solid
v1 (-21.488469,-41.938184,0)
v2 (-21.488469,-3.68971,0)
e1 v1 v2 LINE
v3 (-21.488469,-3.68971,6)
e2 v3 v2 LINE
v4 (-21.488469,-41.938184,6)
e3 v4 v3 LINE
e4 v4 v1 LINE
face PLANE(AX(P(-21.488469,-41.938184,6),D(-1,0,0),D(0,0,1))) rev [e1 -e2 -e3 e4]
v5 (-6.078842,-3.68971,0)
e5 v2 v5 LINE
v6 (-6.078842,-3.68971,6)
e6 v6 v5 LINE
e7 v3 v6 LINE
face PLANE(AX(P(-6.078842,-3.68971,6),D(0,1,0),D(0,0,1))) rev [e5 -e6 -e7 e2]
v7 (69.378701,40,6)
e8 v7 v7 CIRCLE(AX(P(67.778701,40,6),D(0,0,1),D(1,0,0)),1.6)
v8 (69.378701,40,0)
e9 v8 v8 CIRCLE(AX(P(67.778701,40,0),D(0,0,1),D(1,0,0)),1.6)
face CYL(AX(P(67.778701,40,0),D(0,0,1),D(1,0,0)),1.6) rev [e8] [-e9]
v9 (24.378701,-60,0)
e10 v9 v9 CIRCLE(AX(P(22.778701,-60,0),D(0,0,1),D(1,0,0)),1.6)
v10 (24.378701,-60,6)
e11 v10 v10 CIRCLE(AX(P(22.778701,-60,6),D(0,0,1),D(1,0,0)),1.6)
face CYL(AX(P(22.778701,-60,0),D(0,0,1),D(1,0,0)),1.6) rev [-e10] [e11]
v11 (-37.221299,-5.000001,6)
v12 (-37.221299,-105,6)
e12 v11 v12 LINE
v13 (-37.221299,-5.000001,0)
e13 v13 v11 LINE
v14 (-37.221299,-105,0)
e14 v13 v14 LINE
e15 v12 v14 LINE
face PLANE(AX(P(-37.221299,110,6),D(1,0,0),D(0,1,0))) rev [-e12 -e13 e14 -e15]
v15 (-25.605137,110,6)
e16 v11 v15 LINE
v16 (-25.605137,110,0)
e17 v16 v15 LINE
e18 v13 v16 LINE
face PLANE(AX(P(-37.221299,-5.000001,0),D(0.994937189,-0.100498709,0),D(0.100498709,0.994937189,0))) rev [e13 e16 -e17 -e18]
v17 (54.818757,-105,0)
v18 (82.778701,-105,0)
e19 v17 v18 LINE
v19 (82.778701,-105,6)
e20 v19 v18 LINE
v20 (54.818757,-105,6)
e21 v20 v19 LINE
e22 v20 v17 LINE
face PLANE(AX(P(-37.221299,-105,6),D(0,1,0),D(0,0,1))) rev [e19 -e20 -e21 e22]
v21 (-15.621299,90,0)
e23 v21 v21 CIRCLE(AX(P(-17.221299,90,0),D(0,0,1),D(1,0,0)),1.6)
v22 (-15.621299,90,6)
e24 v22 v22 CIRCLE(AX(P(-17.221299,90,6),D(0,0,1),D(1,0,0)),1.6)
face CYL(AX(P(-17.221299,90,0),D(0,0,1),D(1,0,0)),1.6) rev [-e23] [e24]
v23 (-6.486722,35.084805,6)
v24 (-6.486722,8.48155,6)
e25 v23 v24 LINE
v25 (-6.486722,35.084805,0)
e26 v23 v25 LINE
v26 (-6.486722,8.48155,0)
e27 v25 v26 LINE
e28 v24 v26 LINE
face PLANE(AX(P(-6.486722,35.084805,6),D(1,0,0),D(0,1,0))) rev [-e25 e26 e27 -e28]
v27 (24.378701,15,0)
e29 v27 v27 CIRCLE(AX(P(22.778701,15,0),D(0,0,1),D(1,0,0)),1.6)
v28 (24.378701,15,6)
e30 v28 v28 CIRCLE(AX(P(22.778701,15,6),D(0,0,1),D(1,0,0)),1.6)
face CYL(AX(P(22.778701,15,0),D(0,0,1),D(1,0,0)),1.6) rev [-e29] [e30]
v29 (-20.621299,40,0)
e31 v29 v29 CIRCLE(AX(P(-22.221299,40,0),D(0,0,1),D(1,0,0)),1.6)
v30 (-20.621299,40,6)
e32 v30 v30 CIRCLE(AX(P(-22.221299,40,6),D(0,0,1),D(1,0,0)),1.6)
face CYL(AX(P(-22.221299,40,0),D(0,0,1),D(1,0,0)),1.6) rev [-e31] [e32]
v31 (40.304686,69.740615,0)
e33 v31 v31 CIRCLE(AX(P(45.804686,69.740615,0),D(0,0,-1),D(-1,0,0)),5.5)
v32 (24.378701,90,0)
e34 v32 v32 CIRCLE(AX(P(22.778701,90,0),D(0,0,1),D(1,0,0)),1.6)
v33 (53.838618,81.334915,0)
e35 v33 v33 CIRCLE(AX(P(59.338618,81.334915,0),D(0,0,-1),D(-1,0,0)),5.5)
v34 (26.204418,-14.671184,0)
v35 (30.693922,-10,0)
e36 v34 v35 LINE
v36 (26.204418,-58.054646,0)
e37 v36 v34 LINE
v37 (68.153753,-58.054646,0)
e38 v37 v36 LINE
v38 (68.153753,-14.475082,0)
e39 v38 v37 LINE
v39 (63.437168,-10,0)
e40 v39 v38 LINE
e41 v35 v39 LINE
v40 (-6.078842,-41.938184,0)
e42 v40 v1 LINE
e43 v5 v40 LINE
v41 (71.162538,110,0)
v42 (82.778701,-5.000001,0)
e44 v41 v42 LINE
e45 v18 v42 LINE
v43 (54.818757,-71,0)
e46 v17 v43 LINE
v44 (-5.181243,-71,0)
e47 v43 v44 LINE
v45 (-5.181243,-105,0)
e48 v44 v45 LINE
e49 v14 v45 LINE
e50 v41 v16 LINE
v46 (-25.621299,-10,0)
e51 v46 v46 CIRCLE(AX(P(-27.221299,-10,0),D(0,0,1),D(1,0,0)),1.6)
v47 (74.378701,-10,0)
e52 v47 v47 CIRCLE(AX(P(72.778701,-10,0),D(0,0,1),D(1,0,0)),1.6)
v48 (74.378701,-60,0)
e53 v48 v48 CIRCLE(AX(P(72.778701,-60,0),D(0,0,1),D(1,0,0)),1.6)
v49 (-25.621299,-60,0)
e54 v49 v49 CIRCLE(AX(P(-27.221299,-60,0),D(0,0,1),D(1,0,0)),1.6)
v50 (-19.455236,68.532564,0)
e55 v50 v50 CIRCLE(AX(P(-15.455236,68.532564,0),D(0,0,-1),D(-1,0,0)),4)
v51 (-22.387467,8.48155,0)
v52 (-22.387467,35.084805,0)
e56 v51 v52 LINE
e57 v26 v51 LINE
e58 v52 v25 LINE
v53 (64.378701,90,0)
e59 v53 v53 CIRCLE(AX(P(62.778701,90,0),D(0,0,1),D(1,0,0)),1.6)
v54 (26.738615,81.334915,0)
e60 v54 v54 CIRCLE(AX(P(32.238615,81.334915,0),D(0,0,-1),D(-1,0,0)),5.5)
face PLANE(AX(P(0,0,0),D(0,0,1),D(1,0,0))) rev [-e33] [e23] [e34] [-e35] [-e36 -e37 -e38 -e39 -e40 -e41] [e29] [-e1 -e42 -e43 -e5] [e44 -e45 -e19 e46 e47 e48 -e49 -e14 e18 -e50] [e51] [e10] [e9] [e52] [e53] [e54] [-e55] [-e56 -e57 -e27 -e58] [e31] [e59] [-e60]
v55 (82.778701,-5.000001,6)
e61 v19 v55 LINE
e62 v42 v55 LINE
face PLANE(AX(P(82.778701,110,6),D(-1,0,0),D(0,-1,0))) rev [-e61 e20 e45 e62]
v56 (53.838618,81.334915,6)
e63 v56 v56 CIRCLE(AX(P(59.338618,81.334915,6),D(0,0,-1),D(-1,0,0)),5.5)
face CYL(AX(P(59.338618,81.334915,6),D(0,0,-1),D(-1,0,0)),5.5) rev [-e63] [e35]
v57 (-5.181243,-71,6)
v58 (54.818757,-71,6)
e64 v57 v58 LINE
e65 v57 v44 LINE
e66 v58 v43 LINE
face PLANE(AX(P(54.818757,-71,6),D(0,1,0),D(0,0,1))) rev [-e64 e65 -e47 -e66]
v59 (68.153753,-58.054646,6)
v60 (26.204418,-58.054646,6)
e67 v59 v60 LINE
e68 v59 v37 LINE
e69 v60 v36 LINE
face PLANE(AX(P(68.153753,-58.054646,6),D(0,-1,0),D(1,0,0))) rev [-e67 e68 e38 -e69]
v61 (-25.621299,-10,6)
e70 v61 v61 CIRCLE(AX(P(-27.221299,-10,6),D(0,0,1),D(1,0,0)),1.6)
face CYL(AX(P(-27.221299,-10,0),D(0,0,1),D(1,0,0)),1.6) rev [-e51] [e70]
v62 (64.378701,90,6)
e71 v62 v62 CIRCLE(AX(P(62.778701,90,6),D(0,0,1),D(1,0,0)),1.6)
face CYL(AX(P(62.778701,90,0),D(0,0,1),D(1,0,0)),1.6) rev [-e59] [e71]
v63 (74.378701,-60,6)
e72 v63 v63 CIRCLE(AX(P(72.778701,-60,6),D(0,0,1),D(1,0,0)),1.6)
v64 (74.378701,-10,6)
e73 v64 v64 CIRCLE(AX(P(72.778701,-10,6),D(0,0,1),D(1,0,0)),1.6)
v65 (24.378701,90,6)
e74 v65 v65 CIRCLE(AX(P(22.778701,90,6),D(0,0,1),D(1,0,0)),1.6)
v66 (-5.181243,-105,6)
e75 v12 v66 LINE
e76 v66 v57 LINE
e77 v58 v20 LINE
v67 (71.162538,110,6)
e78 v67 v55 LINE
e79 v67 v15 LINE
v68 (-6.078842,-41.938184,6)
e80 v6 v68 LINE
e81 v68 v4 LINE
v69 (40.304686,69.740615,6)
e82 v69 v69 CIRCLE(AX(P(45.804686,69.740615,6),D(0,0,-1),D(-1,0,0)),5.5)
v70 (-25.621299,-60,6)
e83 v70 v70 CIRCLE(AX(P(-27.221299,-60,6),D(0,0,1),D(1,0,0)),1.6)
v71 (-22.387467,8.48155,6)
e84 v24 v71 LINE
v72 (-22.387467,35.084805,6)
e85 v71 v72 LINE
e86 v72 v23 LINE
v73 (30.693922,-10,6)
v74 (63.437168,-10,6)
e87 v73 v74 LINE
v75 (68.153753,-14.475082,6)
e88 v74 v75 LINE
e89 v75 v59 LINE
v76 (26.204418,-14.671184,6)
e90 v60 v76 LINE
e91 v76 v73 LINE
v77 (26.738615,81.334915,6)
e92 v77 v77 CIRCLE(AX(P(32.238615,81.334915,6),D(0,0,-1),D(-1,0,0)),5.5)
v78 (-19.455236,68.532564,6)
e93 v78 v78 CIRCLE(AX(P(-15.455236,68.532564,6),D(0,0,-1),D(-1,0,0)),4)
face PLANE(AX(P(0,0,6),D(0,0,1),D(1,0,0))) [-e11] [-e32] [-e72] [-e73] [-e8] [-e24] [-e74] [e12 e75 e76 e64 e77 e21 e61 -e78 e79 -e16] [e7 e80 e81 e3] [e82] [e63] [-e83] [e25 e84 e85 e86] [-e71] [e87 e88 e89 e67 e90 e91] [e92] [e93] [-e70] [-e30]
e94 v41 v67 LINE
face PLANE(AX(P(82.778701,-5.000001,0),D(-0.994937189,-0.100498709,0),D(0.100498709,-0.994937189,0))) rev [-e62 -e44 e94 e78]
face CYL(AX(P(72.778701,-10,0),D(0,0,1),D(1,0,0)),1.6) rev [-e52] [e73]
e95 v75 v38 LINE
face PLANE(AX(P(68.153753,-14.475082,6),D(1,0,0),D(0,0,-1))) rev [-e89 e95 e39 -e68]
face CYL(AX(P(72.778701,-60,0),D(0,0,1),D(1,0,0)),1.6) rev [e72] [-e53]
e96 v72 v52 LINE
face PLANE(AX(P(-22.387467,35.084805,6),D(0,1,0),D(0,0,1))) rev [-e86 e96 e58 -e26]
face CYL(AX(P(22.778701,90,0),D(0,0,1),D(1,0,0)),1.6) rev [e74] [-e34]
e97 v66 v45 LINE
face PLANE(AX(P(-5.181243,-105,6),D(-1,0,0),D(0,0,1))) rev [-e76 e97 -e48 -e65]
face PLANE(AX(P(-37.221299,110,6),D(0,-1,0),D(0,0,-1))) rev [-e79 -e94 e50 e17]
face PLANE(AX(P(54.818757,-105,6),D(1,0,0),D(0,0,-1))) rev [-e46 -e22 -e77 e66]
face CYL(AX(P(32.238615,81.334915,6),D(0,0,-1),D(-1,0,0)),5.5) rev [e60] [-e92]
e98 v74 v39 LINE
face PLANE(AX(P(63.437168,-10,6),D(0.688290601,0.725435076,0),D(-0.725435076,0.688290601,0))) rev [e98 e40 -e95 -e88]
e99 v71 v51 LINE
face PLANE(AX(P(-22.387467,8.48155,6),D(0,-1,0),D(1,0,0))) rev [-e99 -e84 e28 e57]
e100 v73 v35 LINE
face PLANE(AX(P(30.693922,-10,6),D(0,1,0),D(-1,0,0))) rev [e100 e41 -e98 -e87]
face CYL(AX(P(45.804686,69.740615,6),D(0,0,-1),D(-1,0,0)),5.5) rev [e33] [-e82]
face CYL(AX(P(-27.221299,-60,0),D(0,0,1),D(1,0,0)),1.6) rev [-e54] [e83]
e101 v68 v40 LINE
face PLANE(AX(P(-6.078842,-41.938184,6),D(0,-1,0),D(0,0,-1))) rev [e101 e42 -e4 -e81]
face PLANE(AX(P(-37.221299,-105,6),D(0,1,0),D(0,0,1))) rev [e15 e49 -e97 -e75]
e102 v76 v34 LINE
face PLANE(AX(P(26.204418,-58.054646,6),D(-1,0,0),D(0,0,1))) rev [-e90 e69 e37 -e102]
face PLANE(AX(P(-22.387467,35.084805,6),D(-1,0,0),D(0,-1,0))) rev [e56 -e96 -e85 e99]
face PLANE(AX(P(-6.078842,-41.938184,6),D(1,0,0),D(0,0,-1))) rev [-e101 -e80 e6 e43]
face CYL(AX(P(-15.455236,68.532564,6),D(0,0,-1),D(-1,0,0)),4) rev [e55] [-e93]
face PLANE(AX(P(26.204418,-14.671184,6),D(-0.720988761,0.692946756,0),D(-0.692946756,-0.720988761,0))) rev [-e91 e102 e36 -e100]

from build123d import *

# Parameters (mm, degrees)
ESQUISSE1_W                    = 120
ESQUISSE1_H                    = 215
BOSS_EXTRU_1_DEPTH             = 6
ESQUISSE2_R                    = 1.6
ENL_V_MAT_EXTRU_1_DEPTH        = 138.798088748
R_P_TITION_LIN_AIRE1_OUTLINE_R = 1.6
R_P_TITION_LIN_AIRE1_DEPTH     = 6
ESQUISSE3_R                    = 4
ESQUISSE3_R_2                  = 5.5
ESQUISSE3_W                    = 15.409626965
ESQUISSE3_H                    = 38.248473635
ESQUISSE3_W_2                  = 15.900745579
ESQUISSE3_H_2                  = 26.603255198
ENL_V_MAT_EXTRU_2_DEPTH        = 138.798088748
ENL_V_MAT_EXTRU_3_DEPTH        = 138.798088748
ENL_V_MAT_EXTRU_4_DEPTH        = 138.798088748
ENL_V_MAT_EXTRU_4_DEPTH_BACK   = 138.798088748
ESQUISSE5_W                    = 60
ESQUISSE5_H                    = 33.99999972


# Read off the part's stored shape, not the designer's step: Répétition linéaire1
with BuildPart() as part:
    # Esquisse1 → Boss.-Extru.1 (new body)
    with BuildSketch(Plane.XY):
        with Locations((22.778700537, 2.5)):
            Rectangle(ESQUISSE1_W, ESQUISSE1_H)
    extrude(amount=BOSS_EXTRU_1_DEPTH)

    # Esquisse2 → Enlèv. mat.-Extru.1 (cut, through all)
    with BuildSketch(Plane.XY.offset(6)):
        with Locations((-27.221299463, -60)):
            Circle(ESQUISSE2_R)
    extrude(amount=-ENL_V_MAT_EXTRU_1_DEPTH, mode=Mode.SUBTRACT)

    # Répétition linéaire1 outline → Répétition linéaire1 (cut)
    with BuildSketch(Plane.XY):
        with Locations((-27.221299463, -10)):
            Circle(R_P_TITION_LIN_AIRE1_OUTLINE_R)
        with Locations((-22.221299463, 40)):
            Circle(R_P_TITION_LIN_AIRE1_OUTLINE_R)
        with Locations((-17.221299463, 90)):
            Circle(R_P_TITION_LIN_AIRE1_OUTLINE_R)
        with Locations((22.778700537, -60)):
            Circle(R_P_TITION_LIN_AIRE1_OUTLINE_R)
        with Locations((22.778700537, 15)):
            Circle(R_P_TITION_LIN_AIRE1_OUTLINE_R)
        with Locations((62.778700537, 90)):
            Circle(R_P_TITION_LIN_AIRE1_OUTLINE_R)
        with Locations((67.778700537, 40)):
            Circle(R_P_TITION_LIN_AIRE1_OUTLINE_R)
        with Locations((72.778700537, -10)):
            Circle(R_P_TITION_LIN_AIRE1_OUTLINE_R)
        with Locations((72.778700537, -60)):
            Circle(R_P_TITION_LIN_AIRE1_OUTLINE_R)
        with Locations((22.778700537, 90)):
            Circle(R_P_TITION_LIN_AIRE1_OUTLINE_R)
    extrude(amount=R_P_TITION_LIN_AIRE1_DEPTH, mode=Mode.SUBTRACT)

    # Esquisse3 → Enlèv. mat.-Extru.2 (cut, through all)
    with BuildSketch(Plane(origin=(0, 0, 0), x_dir=(-1, 0, 0), z_dir=(0, 0, -1))):
        with Locations((15.455236492, 68.53256443)):
            Circle(ESQUISSE3_R)
        with Locations((-32.238615261, 81.334914602)):
            Circle(ESQUISSE3_R_2)
        with Locations((-59.338617549, 81.334914602)):
            Circle(ESQUISSE3_R_2)
        with Locations((-45.804685817, 69.740615286)):
            Circle(ESQUISSE3_R_2)
        Polygon((-68.153753001, -58.054646), (-26.204418495, -58.054646), (-26.204418495, -14.671183794), (-30.693922011, -10.00000011), (-63.437167878, -10.00000011), (-68.153753001, -14.47508178), align=None)
        with Locations((13.783655533, -22.813946783)):
            Rectangle(ESQUISSE3_W, ESQUISSE3_H)
        with Locations((14.437094465, 21.783177691)):
            Rectangle(ESQUISSE3_W_2, ESQUISSE3_H_2)
        with BuildLine():
            Line((-30.778700537, -101), (-30.778700537, -105))
            Line((-30.778700537, -105), (-14.778700537, -105))
            Line((-14.778700537, -105), (-14.778700537, -101))
            ThreePointArc((-14.778700537, -101), (-22.778700537, -93), (-30.778700537, -101))
        make_face()
    extrude(amount=-ENL_V_MAT_EXTRU_2_DEPTH, mode=Mode.SUBTRACT)

    # Esquisse4 → Enlèv. mat.-Extru.3 (cut, through all)
    with BuildSketch(Plane.XY.offset(6)):
        Polygon((-37.221299463, 110), (-37.221299463, -5.00000078), (-25.60513741, 110), align=None)
        Polygon((71.162538485, 110), (82.778700537, 110), (82.778700537, -5.00000078), align=None)
    extrude(amount=-ENL_V_MAT_EXTRU_3_DEPTH, mode=Mode.SUBTRACT)

    # Esquisse5 → Enlèv. mat.-Extru.4 (cut, two sides: drawn at the far end of the back side and taken through both)
    with BuildSketch(Plane(origin=(0, 0, 0), x_dir=(-1, 0, 0), z_dir=(0, 0, -1)).offset(-ENL_V_MAT_EXTRU_4_DEPTH_BACK)):
        with Locations((-24.818757264, -88.00000014)):
            Rectangle(ESQUISSE5_W, ESQUISSE5_H)
    extrude(amount=ENL_V_MAT_EXTRU_4_DEPTH + ENL_V_MAT_EXTRU_4_DEPTH_BACK, mode=Mode.SUBTRACT)


solid = part.part
